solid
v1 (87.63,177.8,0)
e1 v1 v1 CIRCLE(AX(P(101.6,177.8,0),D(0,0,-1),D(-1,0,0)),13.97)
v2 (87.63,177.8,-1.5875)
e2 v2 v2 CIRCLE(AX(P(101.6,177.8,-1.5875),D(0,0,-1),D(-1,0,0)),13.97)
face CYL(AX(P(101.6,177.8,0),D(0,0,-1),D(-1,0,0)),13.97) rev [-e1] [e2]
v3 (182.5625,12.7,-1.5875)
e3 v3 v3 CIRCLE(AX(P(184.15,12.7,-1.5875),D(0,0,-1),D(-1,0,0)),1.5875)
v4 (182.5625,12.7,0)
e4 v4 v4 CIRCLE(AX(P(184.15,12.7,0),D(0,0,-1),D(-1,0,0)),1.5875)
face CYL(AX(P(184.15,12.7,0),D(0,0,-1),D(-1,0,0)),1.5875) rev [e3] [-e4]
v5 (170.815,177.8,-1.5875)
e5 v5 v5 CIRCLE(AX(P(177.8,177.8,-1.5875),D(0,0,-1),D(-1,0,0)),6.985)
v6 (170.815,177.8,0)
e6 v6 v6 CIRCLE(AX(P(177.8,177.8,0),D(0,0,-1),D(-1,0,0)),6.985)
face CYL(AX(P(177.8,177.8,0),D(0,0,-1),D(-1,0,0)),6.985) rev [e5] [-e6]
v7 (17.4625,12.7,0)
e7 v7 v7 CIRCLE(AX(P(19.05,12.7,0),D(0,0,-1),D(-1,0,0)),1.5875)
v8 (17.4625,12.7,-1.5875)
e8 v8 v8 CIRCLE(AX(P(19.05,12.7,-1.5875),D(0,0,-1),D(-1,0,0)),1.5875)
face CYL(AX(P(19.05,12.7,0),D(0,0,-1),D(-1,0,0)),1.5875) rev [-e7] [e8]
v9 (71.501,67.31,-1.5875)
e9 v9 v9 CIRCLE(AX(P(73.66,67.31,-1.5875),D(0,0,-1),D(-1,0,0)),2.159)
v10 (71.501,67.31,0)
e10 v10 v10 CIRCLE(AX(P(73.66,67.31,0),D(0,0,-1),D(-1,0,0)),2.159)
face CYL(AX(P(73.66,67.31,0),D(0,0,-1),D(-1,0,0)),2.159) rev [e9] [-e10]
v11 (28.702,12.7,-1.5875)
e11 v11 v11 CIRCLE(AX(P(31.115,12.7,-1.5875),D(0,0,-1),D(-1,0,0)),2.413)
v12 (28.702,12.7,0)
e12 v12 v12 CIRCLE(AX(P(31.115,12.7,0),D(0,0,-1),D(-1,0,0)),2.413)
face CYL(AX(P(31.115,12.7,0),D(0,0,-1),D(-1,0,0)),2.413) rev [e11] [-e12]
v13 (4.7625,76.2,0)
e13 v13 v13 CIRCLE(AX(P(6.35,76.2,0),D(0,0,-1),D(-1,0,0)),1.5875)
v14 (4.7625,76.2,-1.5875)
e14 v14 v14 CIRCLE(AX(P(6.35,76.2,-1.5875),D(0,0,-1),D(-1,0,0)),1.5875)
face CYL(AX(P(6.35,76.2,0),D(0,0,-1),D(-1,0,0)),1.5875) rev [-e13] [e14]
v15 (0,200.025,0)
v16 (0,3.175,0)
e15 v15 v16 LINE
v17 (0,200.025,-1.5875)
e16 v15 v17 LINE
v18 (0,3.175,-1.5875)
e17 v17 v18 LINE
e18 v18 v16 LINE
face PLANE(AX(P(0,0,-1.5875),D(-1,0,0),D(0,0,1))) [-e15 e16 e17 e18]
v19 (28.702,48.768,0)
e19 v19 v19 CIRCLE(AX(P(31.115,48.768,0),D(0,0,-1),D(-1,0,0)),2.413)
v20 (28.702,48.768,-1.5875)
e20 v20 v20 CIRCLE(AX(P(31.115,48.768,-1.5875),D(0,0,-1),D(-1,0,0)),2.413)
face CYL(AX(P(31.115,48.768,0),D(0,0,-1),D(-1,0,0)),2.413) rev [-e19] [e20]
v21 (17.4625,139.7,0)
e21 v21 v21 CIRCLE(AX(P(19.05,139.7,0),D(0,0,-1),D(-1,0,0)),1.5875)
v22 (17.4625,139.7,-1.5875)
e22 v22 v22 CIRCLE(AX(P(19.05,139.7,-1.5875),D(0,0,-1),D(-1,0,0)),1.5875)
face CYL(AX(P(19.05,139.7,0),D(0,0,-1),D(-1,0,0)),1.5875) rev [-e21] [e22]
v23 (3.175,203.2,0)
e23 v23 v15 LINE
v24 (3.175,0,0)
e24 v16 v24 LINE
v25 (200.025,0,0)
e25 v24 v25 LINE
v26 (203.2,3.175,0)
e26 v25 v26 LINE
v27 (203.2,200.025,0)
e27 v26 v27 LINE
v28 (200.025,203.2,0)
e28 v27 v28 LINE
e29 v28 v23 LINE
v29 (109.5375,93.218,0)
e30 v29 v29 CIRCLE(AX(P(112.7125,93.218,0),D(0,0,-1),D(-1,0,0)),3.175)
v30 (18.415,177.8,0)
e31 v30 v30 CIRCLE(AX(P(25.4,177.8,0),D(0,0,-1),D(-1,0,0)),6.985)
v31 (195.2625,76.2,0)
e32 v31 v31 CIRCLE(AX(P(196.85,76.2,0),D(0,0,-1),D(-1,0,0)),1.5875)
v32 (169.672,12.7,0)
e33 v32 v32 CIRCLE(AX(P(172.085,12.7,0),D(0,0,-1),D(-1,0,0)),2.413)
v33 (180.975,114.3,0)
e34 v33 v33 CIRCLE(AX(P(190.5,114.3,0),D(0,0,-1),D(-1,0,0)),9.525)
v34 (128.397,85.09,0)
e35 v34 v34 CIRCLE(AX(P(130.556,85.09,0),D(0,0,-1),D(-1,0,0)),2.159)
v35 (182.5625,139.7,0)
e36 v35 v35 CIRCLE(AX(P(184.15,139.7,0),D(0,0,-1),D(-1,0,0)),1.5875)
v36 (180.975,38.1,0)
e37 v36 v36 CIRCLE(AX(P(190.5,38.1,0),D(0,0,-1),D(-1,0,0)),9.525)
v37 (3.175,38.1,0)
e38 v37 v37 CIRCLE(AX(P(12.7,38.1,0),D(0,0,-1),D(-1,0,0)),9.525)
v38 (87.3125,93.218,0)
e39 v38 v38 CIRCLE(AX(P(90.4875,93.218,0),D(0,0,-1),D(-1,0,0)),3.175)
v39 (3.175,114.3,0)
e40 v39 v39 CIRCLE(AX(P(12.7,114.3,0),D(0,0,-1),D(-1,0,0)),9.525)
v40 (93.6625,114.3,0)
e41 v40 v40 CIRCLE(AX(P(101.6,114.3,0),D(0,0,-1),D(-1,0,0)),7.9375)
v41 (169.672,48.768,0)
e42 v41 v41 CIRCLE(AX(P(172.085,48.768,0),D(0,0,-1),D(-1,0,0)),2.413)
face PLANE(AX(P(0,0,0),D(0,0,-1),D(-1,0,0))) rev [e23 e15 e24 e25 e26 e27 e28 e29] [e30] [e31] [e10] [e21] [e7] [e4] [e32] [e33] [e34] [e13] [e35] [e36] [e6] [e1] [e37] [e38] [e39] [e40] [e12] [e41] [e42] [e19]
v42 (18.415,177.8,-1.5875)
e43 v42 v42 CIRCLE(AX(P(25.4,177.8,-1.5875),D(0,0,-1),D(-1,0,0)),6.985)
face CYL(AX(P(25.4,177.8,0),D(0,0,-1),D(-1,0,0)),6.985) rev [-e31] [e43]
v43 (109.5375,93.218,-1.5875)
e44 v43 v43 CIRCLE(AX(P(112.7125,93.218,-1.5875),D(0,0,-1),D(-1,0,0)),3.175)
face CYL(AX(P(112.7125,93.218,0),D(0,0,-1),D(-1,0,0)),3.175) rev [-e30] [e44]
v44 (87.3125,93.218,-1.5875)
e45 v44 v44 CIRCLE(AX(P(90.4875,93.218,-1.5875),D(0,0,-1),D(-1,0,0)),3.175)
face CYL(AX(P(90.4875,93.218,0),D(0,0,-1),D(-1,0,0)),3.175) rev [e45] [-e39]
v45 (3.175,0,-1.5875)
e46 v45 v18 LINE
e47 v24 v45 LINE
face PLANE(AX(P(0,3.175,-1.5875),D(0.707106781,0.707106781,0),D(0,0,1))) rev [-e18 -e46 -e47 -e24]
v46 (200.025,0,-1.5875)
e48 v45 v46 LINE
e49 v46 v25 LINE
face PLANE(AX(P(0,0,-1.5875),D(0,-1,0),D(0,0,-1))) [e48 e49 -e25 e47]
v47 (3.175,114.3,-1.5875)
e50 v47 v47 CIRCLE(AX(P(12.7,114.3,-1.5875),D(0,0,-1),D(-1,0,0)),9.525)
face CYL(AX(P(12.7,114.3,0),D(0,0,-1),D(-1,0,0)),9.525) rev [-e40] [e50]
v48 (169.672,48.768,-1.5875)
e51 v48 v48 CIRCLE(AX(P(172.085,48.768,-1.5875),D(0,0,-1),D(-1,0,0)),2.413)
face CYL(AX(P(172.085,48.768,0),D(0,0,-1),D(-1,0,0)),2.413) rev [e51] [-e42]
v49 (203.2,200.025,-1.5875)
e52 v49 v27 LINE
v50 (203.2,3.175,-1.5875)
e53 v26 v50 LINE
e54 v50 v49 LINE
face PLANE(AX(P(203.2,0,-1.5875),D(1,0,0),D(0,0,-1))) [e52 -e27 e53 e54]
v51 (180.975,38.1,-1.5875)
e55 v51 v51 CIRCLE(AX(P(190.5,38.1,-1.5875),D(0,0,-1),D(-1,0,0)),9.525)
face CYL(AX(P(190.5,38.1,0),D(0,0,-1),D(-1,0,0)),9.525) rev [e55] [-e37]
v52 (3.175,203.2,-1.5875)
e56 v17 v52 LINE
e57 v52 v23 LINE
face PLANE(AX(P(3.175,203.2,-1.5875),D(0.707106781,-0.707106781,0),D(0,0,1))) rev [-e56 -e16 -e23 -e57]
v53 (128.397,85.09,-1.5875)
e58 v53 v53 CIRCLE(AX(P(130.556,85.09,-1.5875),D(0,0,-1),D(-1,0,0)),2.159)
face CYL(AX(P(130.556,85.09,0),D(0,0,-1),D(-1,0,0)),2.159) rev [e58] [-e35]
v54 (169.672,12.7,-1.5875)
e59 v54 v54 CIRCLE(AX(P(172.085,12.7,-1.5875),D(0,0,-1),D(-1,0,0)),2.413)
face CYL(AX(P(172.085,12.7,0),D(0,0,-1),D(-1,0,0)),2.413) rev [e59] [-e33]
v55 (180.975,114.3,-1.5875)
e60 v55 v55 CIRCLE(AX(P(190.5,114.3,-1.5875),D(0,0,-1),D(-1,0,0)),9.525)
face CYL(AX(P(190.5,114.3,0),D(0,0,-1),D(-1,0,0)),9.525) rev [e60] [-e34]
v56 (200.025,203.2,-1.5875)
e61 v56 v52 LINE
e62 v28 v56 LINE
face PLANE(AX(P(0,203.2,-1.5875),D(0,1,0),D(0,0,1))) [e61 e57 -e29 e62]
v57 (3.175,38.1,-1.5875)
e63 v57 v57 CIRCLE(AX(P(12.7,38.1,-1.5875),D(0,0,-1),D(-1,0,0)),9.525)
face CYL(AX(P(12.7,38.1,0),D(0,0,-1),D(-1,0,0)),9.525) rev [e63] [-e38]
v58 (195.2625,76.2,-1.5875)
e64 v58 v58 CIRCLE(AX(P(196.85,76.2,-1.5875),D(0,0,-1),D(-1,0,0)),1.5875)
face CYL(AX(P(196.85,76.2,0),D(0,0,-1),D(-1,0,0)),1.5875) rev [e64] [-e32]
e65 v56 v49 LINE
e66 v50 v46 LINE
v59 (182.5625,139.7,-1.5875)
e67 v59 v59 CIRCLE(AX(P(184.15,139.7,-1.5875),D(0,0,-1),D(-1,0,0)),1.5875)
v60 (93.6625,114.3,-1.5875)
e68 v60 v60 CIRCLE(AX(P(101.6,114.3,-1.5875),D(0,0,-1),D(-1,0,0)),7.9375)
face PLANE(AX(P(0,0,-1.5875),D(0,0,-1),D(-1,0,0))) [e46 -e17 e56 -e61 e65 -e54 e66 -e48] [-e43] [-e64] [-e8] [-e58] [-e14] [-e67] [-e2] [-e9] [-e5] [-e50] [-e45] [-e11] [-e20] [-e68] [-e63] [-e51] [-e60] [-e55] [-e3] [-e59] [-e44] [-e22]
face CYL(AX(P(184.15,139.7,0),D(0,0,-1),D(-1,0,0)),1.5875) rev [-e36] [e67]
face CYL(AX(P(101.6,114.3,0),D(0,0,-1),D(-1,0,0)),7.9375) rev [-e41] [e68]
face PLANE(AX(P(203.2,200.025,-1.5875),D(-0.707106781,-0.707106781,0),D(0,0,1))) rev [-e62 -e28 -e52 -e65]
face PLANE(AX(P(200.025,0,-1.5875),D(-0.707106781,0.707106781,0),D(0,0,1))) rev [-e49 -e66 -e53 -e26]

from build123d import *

# Parameters (mm, degrees)
SKETCH1_W           = 203.2
SKETCH1_H           = 203.2
BASE_FLANGE1_DEPTH  = 1.5875
SKETCH6_R           = 1.5875
SKETCH6_R_2         = 2.413
SKETCH6_R_3         = 9.525
CUT_EXTRUDE1_DEPTH  = 288.372580731
BREAK_CORNER1_START = -1.5875
BREAK_CORNER1_DEPTH = 1.5875
SKETCH7_R           = 6.985
SKETCH7_R_2         = 13.97
SKETCH7_R_3         = 7.9375
SKETCH7_R_4         = 3.175
SKETCH7_R_5         = 2.159
CUT_EXTRUDE2_DEPTH  = 288.372580731


# Read off the part's stored shape, not the designer's step: Break-Corner1
# Sheet-metal steps are written as plain solids
with BuildPart() as part:
    # Sketch1 → Base-Flange1 (new body)
    with BuildSketch(Plane.XY):
        with Locations((101.6, 101.6)):
            Rectangle(SKETCH1_W, SKETCH1_H)
    extrude(amount=-BASE_FLANGE1_DEPTH)

    # Sketch6 → Cut-Extrude1 (cut, through all)
    with BuildSketch(Plane(origin=(0, 0, -1.5875), x_dir=(-1, 0, 0), z_dir=(0, 0, -1))):
        with Locations((-19.05, 139.7)):
            Circle(SKETCH6_R)
        with Locations((-19.05, 12.7)):
            Circle(SKETCH6_R)
        with Locations((-31.115, 48.768)):
            Circle(SKETCH6_R_2)
        with Locations((-31.115, 12.7)):
            Circle(SKETCH6_R_2)
        with Locations((-172.085, 48.768)):
            Circle(SKETCH6_R_2)
        with Locations((-172.085, 12.7)):
            Circle(SKETCH6_R_2)
        with Locations((-184.15, 139.7)):
            Circle(SKETCH6_R)
        with Locations((-184.15, 12.7)):
            Circle(SKETCH6_R)
        with Locations((-190.5, 38.1)):
            Circle(SKETCH6_R_3)
        with Locations((-190.5, 114.3)):
            Circle(SKETCH6_R_3)
        with Locations((-12.7, 114.3)):
            Circle(SKETCH6_R_3)
        with Locations((-12.7, 38.1)):
            Circle(SKETCH6_R_3)
        with Locations((-6.35, 76.2)):
            Circle(SKETCH6_R)
        with Locations((-196.85, 76.2)):
            Circle(SKETCH6_R)
    extrude(amount=-CUT_EXTRUDE1_DEPTH, mode=Mode.SUBTRACT)

    # Break-Corner1 outline → Break-Corner1 (cut)
    with BuildSketch(Plane.XY.offset(BREAK_CORNER1_START)):
        Polygon((0, 0), (3.175, 0), (0, 3.175), align=None)
        Polygon((203.2, 3.175), (200.025, 0), (203.2, 0), align=None)
        Polygon((0, 203.2), (0, 200.025), (3.175, 203.2), align=None)
        Polygon((200.025, 203.2), (203.2, 200.025), (203.2, 203.2), align=None)
    extrude(amount=BREAK_CORNER1_DEPTH, mode=Mode.SUBTRACT)

    # Sketch7 → Cut-Extrude2 (cut, through all)
    with BuildSketch(Plane(origin=(0, 0, -1.5875), x_dir=(-1, 0, 0), z_dir=(0, 0, -1))):
        with Locations((-177.8, 177.8)):
            Circle(SKETCH7_R)
        with Locations((-101.6, 177.8)):
            Circle(SKETCH7_R_2)
        with Locations((-25.4, 177.8)):
            Circle(SKETCH7_R)
        with Locations((-101.6, 114.3)):
            Circle(SKETCH7_R_3)
        with Locations((-112.7125, 93.218)):
            Circle(SKETCH7_R_4)
        with Locations((-90.4875, 93.218)):
            Circle(SKETCH7_R_4)
        with Locations((-130.556, 85.09)):
            Circle(SKETCH7_R_5)
        with Locations((-73.66, 67.31)):
            Circle(SKETCH7_R_5)
    extrude(amount=-CUT_EXTRUDE2_DEPTH, mode=Mode.SUBTRACT)


solid = part.part
